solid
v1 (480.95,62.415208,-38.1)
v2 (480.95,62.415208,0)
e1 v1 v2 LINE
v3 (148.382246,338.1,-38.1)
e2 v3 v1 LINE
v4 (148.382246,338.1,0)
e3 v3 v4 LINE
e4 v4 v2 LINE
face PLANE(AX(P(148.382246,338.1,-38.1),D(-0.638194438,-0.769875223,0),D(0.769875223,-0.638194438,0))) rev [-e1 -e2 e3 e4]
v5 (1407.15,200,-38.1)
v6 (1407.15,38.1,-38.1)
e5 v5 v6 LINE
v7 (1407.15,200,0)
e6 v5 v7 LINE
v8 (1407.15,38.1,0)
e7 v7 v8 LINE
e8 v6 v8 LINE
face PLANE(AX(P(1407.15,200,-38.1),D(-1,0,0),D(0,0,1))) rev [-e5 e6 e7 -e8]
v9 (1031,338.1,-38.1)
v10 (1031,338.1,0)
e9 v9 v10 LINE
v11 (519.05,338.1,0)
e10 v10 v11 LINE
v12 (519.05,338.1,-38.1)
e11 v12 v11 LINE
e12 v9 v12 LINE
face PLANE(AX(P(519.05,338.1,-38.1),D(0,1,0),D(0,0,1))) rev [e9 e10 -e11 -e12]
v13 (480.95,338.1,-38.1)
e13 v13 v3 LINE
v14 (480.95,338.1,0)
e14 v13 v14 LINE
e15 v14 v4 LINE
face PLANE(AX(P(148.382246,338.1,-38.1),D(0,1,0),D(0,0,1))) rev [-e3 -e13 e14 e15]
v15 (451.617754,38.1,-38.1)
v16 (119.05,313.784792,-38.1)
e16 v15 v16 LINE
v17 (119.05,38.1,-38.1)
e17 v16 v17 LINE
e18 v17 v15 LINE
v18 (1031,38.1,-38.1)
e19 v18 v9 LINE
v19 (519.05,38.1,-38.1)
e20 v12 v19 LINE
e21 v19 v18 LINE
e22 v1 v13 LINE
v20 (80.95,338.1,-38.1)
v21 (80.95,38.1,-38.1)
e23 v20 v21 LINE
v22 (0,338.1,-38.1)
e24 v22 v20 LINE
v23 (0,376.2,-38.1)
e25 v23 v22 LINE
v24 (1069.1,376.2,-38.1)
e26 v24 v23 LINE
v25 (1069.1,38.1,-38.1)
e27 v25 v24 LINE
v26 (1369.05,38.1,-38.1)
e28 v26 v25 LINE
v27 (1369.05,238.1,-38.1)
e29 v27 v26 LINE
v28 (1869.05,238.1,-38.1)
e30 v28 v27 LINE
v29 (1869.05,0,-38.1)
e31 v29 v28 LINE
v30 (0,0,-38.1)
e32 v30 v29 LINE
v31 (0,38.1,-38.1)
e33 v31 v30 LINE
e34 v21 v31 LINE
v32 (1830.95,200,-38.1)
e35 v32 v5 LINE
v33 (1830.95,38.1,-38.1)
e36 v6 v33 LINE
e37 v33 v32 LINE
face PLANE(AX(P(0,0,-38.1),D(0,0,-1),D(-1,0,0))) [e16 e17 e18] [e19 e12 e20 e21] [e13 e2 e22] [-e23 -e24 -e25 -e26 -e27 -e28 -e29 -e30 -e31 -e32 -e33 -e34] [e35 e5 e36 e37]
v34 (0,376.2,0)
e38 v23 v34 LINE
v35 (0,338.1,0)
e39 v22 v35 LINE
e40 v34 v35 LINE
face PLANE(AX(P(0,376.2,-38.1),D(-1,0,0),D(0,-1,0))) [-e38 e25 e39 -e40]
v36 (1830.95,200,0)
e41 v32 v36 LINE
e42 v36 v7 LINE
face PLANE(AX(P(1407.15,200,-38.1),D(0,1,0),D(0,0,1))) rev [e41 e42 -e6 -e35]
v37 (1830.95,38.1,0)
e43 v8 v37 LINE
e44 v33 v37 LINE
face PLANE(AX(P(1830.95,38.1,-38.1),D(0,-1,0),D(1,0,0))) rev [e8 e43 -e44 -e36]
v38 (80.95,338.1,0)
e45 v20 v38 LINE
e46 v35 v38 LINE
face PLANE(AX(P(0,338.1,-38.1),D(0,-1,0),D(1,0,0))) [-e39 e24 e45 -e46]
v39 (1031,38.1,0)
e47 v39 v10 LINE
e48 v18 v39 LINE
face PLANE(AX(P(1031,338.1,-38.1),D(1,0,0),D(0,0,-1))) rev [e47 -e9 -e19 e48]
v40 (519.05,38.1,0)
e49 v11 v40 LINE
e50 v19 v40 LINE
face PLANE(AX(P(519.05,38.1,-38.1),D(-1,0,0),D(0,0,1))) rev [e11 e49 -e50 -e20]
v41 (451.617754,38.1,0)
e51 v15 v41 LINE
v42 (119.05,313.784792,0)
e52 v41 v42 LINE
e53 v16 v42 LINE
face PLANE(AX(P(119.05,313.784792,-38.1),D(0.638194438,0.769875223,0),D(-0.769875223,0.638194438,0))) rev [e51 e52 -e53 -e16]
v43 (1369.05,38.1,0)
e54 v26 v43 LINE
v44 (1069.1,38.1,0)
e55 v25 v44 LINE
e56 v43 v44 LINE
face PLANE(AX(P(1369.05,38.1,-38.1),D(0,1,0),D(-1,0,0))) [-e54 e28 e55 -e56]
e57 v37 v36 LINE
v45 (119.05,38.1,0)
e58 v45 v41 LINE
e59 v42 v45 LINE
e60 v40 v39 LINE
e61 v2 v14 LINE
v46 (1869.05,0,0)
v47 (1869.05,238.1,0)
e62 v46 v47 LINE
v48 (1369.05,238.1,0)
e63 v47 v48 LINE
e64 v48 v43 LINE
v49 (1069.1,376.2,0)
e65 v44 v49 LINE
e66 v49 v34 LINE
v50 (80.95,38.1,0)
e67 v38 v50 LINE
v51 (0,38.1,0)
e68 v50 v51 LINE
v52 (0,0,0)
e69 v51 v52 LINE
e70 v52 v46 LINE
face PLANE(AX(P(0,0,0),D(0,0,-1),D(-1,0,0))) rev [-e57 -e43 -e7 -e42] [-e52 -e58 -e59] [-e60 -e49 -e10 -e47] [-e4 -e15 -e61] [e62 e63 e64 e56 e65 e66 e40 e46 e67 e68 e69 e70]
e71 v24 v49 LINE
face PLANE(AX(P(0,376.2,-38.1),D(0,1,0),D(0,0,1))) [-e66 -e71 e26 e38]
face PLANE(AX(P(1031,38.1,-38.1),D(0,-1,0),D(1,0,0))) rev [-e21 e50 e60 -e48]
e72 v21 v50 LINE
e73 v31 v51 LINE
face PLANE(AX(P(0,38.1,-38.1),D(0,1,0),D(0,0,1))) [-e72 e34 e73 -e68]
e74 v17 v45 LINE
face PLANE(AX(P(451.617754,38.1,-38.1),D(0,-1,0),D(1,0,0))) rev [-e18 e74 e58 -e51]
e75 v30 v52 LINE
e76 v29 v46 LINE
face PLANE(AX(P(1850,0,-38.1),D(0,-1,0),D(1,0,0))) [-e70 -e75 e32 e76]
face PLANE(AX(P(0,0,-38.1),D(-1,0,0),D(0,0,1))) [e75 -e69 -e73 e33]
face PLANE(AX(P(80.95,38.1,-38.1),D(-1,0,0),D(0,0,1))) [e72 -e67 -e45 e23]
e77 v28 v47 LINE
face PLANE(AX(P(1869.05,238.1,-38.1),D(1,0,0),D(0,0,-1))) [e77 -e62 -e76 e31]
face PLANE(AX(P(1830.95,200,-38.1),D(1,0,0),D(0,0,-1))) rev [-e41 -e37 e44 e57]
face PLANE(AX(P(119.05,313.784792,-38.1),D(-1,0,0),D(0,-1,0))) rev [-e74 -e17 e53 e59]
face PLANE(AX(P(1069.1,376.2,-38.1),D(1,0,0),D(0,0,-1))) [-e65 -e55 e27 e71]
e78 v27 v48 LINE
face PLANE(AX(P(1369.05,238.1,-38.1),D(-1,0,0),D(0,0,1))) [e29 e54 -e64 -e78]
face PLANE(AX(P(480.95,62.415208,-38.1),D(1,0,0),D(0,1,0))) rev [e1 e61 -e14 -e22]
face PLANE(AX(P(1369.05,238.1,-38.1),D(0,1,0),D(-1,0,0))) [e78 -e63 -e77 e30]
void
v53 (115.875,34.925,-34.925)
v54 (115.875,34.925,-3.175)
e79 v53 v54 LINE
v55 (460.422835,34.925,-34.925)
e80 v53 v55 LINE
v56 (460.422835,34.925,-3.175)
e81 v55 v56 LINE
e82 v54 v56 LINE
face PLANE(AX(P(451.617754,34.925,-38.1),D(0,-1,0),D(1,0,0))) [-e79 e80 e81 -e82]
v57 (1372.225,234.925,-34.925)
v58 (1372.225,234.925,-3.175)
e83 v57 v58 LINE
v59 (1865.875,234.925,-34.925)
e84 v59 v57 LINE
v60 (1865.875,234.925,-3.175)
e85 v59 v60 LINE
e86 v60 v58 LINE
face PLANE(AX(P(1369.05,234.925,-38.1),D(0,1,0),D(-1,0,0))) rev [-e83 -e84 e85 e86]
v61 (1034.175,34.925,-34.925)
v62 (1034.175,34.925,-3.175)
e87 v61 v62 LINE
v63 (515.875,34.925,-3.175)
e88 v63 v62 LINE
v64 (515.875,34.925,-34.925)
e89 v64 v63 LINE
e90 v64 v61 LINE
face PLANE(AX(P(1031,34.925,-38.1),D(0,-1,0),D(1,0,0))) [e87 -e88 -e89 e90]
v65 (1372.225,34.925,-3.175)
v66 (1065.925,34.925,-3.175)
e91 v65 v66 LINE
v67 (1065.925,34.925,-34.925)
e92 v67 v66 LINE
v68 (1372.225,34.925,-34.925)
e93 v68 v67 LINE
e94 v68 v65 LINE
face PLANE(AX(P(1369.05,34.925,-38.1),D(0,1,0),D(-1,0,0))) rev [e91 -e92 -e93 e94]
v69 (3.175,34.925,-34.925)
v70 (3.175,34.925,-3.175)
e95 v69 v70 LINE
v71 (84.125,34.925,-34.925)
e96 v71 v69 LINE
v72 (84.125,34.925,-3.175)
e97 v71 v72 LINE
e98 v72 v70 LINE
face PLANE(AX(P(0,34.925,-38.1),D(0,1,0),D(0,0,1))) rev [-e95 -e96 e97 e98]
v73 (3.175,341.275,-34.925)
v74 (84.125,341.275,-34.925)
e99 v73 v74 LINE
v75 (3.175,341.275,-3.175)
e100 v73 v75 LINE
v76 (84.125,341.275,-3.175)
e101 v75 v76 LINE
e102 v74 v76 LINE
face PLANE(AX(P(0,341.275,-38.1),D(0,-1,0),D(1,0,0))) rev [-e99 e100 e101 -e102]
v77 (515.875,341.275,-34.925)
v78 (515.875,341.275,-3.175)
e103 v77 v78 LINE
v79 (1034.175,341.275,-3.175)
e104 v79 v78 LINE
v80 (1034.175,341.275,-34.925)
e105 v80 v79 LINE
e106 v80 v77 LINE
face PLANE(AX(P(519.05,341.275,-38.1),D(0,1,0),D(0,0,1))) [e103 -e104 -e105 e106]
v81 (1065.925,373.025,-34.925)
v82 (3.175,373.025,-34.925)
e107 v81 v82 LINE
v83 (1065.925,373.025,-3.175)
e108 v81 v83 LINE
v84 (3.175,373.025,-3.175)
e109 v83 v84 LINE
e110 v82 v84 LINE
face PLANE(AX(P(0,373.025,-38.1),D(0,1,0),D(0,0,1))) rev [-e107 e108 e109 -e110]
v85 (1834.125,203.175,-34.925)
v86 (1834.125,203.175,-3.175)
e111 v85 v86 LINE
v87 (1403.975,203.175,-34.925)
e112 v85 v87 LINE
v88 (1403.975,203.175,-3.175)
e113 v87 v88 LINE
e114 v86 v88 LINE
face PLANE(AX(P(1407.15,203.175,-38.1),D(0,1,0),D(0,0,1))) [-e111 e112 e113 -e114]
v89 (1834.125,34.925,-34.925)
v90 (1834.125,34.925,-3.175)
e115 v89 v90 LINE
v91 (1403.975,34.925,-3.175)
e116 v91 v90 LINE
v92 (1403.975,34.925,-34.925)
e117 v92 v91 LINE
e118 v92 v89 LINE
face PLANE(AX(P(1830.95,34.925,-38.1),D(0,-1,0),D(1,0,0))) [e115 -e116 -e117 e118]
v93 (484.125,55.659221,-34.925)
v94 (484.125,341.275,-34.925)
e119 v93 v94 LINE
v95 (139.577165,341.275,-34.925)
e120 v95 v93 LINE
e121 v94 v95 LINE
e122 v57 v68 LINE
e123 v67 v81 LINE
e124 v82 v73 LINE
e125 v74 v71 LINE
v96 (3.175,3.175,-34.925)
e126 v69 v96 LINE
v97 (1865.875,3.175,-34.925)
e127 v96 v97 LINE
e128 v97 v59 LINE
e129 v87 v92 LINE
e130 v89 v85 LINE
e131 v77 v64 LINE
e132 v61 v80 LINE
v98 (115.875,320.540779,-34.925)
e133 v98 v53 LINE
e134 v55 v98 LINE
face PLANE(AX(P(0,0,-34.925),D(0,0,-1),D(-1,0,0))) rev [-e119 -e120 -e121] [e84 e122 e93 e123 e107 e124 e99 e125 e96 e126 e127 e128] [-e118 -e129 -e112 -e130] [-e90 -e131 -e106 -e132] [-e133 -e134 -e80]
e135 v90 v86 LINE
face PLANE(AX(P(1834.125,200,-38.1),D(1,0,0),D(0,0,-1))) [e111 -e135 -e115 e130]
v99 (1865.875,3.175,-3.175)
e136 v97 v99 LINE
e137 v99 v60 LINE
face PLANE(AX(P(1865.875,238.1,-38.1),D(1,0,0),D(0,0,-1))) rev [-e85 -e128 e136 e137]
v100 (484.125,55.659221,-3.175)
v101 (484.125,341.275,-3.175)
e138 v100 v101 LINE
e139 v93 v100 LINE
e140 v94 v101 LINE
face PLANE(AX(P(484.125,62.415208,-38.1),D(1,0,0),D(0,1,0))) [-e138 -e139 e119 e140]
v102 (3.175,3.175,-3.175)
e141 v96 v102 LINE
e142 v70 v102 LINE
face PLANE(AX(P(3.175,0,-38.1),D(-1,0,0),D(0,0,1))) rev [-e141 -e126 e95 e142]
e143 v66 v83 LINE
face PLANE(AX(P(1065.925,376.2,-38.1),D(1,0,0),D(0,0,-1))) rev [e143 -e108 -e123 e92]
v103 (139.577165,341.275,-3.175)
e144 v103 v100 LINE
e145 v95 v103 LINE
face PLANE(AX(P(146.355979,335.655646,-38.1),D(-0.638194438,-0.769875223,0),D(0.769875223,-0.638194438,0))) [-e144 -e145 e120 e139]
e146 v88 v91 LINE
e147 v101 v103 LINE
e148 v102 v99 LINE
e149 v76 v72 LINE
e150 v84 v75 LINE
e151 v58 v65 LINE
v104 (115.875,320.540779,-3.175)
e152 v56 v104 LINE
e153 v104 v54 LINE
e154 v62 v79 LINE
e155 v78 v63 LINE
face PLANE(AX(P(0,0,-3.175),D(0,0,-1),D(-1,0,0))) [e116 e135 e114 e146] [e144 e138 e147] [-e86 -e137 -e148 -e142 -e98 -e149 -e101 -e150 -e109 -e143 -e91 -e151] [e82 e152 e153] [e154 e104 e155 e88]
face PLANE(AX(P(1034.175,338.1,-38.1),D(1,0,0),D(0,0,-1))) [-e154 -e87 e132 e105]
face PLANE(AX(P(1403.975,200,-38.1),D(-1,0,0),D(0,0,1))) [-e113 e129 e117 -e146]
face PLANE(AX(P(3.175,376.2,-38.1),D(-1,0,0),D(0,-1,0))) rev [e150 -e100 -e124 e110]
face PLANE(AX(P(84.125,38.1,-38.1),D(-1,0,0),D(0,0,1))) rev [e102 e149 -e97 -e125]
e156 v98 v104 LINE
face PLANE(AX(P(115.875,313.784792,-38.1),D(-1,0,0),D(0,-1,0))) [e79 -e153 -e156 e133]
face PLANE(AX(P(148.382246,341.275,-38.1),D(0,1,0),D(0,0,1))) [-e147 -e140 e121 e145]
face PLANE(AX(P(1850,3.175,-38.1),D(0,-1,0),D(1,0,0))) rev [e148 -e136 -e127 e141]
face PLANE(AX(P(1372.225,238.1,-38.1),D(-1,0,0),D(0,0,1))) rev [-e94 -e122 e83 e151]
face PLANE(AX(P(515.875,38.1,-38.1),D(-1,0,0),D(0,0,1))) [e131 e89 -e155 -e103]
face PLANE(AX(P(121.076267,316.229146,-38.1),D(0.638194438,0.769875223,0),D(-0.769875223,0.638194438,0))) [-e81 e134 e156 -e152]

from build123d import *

# Parameters (mm, degrees)
SKETCH1_W           = 511.95
SKETCH1_H           = 300
SKETCH1_W_2         = 423.8
SKETCH1_H_2         = 161.9
BOSS_EXTRUDE1_DEPTH = 38.1
SHELL1_START        = -34.925
SHELL1_OUTLINE_W    = 430.15
SHELL1_OUTLINE_H    = 168.25
SHELL1_OUTLINE_W_2  = 518.3
SHELL1_OUTLINE_H_2  = 306.35
SHELL1_DEPTH        = 31.75


# Read off the part's stored shape, not the designer's step: Shell1
with BuildPart() as part:
    # Sketch1 → Boss-Extrude1 (new body)
    with BuildSketch(Plane.XY):
        Polygon((0, 0), (1850, 0), (1869.05, 0), (1869.05, 38.1), (1869.05, 238.1), (1369.05, 238.1), (1369.05, 38.1), (1069.1, 38.1), (1069.1, 338.1), (1069.1, 376.2), (0, 376.2), (0, 338.1), (80.95, 338.1), (80.95, 38.1), (0, 38.1), align=None)
        with Locations((775.025, 188.1)):
            Rectangle(SKETCH1_W, SKETCH1_H, mode=Mode.SUBTRACT)
        Polygon((451.617753988, 38.1), (119.05, 38.1), (119.05, 313.784791922), align=None, mode=Mode.SUBTRACT)
        Polygon((148.382246012, 338.1), (480.95, 338.1), (480.95, 62.415208078), align=None, mode=Mode.SUBTRACT)
        with Locations((1619.05, 119.05)):
            Rectangle(SKETCH1_W_2, SKETCH1_H_2, mode=Mode.SUBTRACT)
    extrude(amount=-BOSS_EXTRUDE1_DEPTH)

    # Shell1 outline → Shell1 (cut)
    with BuildSketch(Plane.XY.offset(SHELL1_START)):
        Polygon((84.125, 34.925), (3.175, 34.925), (3.175, 3.175), (1865.875, 3.175), (1865.875, 234.925), (1372.225, 234.925), (1372.225, 34.925), (1065.925, 34.925), (1065.925, 373.025), (3.175, 373.025), (3.175, 341.275), (84.125, 341.275), align=None)
        Polygon((460.42283517, 34.925), (115.875, 34.925), (115.875, 320.540779362), align=None, mode=Mode.SUBTRACT)
        with Locations((1619.05, 119.05)):
            Rectangle(SHELL1_OUTLINE_W, SHELL1_OUTLINE_H, mode=Mode.SUBTRACT)
        Polygon((139.57716483, 341.275), (484.125, 341.275), (484.125, 55.659220638), align=None, mode=Mode.SUBTRACT)
        with Locations((775.025, 188.1)):
            Rectangle(SHELL1_OUTLINE_W_2, SHELL1_OUTLINE_H_2, mode=Mode.SUBTRACT)
    extrude(amount=SHELL1_DEPTH, mode=Mode.SUBTRACT)


solid = part.part
